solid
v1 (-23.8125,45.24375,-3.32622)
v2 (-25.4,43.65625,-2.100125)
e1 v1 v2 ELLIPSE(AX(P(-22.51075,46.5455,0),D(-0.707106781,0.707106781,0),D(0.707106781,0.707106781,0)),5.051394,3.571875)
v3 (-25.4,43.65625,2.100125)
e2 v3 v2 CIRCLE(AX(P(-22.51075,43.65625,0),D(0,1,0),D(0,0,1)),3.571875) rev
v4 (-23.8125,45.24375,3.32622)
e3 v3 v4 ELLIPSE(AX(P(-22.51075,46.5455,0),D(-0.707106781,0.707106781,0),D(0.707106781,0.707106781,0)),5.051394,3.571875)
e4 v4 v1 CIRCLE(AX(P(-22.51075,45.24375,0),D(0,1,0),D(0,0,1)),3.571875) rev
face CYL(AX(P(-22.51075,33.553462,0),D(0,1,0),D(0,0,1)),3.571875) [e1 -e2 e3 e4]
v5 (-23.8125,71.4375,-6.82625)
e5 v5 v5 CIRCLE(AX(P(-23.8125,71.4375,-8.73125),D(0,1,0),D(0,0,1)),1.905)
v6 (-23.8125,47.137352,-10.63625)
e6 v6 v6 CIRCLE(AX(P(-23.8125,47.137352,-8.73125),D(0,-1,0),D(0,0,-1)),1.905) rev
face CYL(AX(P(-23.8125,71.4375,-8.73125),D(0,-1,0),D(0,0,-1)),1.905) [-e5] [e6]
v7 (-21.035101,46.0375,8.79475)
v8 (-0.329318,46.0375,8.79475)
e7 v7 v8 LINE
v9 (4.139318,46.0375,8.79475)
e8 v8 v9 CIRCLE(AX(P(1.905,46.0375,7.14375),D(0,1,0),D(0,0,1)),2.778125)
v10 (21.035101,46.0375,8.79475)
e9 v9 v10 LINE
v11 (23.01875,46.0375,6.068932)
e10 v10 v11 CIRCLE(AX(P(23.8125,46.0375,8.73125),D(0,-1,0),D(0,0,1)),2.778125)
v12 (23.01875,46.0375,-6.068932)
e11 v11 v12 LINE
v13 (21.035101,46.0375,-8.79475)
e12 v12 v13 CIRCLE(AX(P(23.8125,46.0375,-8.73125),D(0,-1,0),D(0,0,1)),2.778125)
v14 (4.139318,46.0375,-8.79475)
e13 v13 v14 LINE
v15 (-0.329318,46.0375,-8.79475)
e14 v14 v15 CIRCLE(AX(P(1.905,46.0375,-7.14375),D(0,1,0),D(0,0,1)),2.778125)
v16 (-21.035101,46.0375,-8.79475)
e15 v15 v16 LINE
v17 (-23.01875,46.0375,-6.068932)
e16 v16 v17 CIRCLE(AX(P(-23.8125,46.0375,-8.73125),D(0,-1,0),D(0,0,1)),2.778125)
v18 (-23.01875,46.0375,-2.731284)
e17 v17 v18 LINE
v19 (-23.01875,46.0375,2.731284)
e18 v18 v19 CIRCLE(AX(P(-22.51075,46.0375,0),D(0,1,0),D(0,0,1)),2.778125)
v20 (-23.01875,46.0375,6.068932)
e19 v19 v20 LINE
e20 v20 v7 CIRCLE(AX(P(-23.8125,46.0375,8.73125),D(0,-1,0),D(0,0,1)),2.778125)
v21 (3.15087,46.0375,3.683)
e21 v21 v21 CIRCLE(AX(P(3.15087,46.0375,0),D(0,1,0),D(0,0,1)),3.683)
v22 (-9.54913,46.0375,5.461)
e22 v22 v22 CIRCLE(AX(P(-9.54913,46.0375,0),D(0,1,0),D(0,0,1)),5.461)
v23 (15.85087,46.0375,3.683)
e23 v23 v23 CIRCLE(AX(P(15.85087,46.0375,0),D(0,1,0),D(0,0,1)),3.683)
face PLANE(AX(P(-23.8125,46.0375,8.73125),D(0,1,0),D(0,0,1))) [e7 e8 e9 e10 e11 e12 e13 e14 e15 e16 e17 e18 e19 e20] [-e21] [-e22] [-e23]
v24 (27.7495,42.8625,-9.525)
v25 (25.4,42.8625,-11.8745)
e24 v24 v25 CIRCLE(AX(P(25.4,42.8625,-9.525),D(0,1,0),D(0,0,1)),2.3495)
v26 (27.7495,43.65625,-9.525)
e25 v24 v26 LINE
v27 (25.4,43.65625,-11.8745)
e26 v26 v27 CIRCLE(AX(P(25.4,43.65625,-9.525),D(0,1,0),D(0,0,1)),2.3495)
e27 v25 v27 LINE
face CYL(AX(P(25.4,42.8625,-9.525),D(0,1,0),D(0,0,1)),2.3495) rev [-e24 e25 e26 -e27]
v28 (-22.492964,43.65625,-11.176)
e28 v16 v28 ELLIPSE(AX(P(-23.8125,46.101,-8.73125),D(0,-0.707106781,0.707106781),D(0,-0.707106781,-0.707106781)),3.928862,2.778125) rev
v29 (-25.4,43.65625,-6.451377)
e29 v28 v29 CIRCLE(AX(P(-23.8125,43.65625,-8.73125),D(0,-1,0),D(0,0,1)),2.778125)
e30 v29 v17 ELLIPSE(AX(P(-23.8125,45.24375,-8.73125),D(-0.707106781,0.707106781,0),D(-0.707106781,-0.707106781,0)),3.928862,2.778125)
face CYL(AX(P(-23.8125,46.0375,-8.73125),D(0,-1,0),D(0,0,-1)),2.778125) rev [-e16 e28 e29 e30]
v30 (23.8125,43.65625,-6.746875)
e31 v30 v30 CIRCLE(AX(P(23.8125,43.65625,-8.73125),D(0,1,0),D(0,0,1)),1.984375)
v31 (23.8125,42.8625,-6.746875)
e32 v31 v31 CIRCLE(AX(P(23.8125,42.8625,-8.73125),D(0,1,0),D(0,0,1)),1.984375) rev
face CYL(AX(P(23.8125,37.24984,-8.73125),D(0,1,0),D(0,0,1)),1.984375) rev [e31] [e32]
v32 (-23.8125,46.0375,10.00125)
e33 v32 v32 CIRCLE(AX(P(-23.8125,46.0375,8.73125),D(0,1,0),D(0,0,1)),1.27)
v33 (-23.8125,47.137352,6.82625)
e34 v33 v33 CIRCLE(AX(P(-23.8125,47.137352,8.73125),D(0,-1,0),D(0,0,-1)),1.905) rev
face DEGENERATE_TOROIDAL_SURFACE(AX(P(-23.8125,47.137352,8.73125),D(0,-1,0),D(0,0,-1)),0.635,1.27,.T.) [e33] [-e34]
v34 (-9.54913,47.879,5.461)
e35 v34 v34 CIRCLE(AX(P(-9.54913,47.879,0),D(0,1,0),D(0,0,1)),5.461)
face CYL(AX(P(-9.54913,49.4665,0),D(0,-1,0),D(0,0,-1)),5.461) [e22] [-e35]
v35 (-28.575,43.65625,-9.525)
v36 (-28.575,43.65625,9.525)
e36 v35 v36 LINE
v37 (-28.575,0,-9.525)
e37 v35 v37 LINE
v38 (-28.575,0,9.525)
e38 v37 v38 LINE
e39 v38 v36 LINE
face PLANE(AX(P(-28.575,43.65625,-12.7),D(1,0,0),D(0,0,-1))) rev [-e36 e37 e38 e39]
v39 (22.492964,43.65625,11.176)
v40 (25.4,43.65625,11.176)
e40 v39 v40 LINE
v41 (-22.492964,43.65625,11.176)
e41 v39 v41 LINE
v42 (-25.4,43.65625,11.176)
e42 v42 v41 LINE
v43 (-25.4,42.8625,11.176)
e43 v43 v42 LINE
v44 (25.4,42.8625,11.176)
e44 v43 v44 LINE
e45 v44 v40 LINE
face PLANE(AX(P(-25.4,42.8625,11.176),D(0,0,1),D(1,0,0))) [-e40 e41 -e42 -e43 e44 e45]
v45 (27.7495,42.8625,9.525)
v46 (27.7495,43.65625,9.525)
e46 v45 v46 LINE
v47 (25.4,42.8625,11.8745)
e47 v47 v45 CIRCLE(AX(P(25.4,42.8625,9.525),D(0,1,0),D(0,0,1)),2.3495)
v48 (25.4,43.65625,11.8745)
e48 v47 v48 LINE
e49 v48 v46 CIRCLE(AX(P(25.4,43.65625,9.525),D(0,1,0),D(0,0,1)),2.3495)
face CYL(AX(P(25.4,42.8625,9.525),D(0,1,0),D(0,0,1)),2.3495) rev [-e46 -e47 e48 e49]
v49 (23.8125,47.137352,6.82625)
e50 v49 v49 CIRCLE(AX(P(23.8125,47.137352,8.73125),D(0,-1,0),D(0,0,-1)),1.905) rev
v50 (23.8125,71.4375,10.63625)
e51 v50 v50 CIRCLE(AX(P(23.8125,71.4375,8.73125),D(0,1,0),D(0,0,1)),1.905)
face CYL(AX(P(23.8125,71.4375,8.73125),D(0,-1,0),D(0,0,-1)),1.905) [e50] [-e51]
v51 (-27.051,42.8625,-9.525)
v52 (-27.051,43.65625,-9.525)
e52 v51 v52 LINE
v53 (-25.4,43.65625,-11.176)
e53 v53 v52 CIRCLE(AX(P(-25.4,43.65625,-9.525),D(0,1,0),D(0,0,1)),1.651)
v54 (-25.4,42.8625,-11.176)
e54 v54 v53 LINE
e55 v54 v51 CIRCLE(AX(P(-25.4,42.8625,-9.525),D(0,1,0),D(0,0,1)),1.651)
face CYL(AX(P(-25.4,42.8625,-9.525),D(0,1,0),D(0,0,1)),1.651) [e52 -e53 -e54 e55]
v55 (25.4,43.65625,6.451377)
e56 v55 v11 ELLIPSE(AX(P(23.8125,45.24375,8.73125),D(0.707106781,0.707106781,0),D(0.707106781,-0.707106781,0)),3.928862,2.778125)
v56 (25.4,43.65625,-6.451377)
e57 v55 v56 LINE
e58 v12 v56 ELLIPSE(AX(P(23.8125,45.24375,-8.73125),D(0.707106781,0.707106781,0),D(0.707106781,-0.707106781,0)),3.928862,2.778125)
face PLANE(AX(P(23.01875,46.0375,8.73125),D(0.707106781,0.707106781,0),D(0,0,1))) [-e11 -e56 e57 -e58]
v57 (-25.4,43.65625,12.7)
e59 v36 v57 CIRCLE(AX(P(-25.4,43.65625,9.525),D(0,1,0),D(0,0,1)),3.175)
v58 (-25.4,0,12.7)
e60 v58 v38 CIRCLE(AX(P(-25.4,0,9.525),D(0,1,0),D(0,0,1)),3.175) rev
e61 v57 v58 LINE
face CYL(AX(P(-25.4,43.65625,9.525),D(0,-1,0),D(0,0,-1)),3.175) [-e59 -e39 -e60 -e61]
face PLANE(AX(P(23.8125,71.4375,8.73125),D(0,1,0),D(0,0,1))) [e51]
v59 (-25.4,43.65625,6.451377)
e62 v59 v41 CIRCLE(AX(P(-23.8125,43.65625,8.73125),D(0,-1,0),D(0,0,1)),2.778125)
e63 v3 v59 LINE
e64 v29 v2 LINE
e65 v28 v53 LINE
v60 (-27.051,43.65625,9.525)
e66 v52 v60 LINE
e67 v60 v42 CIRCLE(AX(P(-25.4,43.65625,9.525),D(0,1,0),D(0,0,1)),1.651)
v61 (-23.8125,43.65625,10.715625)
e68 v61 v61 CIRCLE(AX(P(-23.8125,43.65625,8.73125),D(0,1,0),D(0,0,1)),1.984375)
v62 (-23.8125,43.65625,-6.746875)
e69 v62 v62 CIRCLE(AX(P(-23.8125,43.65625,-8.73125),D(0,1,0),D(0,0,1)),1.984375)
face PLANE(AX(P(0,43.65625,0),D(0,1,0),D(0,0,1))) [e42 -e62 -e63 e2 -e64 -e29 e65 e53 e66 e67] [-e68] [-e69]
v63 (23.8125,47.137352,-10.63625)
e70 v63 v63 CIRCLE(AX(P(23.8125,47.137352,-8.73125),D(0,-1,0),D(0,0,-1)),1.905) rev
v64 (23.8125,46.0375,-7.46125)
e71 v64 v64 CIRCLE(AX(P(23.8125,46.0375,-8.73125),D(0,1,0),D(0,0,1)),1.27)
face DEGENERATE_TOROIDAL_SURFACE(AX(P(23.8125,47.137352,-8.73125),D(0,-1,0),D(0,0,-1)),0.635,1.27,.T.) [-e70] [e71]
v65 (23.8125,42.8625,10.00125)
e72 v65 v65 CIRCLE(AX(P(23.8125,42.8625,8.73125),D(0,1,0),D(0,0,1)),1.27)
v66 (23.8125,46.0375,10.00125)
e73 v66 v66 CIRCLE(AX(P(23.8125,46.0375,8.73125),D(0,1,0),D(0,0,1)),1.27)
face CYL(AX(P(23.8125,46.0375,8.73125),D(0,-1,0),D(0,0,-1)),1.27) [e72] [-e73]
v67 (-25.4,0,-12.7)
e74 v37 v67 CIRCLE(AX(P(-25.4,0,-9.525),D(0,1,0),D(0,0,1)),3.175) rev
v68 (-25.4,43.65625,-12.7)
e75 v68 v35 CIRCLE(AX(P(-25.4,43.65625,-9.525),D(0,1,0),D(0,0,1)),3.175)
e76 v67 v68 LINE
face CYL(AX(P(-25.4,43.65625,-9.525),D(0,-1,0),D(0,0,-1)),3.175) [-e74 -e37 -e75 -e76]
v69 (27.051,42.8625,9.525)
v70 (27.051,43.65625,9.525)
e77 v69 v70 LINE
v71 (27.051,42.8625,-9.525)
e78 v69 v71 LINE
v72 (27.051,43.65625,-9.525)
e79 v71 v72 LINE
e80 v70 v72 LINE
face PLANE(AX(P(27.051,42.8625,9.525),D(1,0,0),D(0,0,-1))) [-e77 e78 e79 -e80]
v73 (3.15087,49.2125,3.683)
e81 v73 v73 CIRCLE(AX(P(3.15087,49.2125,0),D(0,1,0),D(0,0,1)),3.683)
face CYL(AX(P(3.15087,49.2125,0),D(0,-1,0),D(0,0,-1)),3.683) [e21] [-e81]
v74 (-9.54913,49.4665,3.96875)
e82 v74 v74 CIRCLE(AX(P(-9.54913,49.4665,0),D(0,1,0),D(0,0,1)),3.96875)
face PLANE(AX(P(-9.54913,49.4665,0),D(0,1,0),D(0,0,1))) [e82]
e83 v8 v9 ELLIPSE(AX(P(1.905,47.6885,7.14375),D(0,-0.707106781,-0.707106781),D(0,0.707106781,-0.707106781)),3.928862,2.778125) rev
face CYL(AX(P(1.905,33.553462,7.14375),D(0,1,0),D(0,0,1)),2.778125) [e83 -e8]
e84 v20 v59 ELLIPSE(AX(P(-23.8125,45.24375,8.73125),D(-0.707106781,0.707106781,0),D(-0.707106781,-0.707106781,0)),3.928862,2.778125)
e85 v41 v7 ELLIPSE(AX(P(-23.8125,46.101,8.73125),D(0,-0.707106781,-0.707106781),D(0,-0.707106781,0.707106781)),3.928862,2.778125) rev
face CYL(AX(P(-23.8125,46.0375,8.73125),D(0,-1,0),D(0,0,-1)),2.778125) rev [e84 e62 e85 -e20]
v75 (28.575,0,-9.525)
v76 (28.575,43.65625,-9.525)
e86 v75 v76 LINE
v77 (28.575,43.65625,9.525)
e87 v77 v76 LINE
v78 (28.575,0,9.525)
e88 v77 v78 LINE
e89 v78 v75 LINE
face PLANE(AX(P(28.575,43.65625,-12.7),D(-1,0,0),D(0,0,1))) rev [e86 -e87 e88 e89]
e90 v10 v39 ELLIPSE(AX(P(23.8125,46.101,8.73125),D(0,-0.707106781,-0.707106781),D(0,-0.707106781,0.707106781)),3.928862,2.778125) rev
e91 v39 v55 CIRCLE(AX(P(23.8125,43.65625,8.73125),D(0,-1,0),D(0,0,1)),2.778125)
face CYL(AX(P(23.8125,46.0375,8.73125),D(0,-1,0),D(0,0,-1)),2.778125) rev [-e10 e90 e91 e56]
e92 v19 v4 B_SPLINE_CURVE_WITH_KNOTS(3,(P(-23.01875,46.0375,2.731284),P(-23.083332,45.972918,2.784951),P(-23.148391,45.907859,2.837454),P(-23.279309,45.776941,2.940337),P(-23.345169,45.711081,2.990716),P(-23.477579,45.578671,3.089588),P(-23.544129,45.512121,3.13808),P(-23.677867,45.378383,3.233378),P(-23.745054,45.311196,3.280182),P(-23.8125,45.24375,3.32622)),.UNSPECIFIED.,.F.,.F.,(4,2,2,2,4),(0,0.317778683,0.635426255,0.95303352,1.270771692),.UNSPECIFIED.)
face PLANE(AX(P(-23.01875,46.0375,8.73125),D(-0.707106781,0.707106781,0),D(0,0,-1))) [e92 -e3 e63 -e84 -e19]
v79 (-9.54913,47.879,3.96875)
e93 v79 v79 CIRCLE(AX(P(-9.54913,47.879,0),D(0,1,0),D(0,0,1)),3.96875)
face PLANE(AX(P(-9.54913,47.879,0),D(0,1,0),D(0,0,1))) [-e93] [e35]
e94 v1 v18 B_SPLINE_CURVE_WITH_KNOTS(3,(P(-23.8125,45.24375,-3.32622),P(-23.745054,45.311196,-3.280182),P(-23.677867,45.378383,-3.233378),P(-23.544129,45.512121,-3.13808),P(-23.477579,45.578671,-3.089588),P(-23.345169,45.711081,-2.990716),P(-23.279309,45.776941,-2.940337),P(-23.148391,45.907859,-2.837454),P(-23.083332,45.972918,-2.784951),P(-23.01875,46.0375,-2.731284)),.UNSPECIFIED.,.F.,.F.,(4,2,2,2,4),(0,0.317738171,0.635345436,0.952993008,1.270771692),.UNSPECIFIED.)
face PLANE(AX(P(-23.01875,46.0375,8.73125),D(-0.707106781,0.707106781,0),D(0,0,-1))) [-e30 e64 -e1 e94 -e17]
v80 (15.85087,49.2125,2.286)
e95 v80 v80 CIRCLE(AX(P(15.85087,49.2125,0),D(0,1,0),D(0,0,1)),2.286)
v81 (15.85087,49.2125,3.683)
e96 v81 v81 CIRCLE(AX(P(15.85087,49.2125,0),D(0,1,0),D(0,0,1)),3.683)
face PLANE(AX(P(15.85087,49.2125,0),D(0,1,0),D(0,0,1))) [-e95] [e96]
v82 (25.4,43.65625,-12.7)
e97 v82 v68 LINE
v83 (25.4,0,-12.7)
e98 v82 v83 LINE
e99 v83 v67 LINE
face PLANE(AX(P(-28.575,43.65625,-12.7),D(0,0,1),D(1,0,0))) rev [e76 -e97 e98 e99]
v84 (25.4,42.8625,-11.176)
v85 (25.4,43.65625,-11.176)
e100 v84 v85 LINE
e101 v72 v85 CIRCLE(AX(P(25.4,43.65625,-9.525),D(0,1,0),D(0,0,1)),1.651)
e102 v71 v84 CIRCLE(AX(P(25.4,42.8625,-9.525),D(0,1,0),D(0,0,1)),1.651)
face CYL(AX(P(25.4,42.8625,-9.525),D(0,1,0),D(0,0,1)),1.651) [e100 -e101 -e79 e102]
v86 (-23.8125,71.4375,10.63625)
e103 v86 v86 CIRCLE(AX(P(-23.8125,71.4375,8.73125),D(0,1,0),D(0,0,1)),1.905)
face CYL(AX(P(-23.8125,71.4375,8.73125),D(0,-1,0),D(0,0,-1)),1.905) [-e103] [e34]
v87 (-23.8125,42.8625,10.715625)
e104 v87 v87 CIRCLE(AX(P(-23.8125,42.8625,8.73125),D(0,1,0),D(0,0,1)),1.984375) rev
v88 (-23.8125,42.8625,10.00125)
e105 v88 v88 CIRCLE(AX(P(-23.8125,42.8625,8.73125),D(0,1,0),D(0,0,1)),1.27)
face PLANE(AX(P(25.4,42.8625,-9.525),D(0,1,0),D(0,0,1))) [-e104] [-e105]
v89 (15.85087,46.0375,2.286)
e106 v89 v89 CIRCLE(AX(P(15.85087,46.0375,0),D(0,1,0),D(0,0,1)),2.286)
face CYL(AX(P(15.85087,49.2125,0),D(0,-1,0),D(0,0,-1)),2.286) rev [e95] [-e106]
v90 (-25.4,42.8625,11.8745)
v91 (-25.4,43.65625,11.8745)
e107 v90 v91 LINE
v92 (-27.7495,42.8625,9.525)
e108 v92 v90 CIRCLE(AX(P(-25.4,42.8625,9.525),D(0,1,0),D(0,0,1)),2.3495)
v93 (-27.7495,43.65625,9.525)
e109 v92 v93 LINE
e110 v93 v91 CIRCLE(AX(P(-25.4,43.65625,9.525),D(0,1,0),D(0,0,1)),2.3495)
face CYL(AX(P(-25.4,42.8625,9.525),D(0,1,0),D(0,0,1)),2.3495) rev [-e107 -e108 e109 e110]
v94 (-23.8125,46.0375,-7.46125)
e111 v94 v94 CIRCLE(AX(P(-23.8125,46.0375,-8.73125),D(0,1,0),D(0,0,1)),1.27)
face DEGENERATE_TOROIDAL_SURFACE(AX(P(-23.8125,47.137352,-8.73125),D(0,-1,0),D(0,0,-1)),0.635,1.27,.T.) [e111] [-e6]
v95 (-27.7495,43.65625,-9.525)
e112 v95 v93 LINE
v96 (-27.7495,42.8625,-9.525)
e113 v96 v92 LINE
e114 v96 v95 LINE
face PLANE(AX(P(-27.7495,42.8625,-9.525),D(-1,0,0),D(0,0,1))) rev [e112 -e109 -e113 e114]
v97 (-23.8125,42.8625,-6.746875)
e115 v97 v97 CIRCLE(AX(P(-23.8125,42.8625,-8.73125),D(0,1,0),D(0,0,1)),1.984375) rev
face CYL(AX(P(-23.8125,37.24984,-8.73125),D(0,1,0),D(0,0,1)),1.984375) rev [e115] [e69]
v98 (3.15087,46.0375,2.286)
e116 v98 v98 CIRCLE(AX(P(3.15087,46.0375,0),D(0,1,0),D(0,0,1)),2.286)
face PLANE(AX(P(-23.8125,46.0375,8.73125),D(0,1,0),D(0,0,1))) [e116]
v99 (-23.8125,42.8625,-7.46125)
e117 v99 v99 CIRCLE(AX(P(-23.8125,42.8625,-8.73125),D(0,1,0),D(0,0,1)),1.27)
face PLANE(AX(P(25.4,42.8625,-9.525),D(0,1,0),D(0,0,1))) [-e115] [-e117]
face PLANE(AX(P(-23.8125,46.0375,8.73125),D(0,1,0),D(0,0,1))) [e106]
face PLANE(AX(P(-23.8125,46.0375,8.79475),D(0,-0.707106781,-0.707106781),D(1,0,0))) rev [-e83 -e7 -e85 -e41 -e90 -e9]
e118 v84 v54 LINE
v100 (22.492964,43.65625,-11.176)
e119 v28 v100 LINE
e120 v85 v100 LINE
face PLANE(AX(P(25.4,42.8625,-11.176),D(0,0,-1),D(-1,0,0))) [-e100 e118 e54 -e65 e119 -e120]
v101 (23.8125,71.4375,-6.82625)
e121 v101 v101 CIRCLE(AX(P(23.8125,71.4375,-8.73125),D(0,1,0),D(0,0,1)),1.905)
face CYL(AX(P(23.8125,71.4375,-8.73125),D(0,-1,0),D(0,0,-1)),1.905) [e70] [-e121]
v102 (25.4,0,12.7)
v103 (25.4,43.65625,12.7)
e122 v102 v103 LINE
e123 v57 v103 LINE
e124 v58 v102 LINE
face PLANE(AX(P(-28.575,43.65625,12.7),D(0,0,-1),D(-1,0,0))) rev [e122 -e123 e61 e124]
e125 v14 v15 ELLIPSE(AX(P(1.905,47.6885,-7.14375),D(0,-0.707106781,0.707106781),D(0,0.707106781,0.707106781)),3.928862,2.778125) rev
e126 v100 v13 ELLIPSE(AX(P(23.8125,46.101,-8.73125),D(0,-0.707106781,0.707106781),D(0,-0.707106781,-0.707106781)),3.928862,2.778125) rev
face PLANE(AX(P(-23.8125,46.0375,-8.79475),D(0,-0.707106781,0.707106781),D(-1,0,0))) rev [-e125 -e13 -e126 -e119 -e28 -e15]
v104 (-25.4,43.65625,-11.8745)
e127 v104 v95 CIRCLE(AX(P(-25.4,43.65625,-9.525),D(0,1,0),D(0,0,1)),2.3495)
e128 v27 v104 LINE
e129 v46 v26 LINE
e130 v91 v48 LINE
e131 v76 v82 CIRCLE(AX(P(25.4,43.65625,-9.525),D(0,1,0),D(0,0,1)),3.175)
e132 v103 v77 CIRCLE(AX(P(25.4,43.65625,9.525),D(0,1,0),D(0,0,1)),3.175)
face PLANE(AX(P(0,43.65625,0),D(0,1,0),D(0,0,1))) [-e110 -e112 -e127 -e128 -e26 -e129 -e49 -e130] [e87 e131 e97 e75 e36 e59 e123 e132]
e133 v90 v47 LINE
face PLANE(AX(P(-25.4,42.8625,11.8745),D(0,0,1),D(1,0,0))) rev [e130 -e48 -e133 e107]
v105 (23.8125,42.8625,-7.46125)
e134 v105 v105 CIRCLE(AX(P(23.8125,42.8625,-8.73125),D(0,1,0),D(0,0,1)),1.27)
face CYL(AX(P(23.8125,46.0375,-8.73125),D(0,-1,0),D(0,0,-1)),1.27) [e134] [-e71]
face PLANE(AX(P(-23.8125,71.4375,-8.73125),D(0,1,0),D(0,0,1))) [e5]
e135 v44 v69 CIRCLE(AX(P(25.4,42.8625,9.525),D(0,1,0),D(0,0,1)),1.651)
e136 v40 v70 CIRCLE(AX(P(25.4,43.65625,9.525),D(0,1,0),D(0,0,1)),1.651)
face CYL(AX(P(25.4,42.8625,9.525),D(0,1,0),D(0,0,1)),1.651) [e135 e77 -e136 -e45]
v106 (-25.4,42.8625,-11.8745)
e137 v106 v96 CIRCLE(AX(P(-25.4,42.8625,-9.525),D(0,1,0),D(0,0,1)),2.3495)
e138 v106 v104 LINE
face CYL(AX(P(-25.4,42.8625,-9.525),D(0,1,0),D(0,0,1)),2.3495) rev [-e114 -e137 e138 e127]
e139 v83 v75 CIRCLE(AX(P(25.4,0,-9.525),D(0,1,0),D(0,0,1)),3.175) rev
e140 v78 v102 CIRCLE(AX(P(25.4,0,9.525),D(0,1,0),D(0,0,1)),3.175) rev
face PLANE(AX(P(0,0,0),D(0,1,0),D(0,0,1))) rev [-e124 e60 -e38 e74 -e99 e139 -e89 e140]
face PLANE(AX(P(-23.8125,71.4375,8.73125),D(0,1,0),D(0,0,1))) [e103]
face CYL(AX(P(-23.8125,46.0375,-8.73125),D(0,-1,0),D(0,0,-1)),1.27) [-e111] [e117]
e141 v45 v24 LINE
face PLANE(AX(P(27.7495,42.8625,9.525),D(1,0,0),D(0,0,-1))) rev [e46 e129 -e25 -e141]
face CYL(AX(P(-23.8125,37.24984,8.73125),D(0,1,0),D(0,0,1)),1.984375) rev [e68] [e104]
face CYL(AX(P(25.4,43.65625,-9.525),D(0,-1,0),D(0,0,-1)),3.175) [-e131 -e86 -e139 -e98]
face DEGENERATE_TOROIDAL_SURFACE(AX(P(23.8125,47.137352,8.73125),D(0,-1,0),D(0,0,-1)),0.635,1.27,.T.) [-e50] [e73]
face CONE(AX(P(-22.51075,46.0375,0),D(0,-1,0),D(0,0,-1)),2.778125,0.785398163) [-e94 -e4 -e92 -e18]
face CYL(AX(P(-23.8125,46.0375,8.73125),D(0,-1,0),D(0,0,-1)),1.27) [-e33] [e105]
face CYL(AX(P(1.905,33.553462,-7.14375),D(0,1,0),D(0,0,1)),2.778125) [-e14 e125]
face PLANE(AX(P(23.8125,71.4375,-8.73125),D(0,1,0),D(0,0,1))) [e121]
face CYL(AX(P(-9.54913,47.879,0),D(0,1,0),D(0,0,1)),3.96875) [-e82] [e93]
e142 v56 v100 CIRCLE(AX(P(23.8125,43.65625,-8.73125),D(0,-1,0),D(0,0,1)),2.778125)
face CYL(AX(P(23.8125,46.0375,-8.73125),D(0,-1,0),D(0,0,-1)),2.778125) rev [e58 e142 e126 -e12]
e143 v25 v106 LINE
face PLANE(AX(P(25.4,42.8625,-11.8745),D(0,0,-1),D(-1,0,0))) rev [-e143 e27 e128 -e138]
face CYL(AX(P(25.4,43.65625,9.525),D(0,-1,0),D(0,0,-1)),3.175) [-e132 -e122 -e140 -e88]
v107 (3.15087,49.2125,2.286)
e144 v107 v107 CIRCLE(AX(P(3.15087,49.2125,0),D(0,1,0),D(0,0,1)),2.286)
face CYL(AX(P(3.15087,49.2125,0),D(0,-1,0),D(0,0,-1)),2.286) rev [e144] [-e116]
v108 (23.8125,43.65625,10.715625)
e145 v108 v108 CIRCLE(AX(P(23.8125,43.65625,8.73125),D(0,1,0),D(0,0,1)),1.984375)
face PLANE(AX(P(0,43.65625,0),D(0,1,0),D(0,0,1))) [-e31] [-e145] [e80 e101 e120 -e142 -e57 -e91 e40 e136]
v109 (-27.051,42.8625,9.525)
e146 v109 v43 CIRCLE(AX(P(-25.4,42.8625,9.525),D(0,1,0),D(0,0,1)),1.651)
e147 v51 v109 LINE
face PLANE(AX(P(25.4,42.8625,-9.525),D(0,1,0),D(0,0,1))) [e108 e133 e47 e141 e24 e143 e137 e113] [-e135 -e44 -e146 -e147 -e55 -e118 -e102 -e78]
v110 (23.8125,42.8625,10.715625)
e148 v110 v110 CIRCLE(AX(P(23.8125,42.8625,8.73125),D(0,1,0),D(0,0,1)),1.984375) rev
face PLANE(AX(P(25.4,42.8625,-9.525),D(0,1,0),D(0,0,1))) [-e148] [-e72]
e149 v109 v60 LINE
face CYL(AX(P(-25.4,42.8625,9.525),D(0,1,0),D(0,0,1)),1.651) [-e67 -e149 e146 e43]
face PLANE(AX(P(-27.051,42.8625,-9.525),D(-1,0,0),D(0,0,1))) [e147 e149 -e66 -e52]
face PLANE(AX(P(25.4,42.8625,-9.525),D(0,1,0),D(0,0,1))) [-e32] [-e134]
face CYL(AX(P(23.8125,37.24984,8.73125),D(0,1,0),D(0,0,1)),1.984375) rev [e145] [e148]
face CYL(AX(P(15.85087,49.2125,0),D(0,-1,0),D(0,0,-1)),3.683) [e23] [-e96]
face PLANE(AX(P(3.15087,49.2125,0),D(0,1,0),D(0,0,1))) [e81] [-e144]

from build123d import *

# Parameters (mm, degrees)
SKETCH1_W           = 57.15
SKETCH1_H           = 25.4
BOSS_EXTRUDE1_DEPTH = 43.65625
FILLET1_R           = 3.175
CUT_EXTRUDE1_DEPTH  = 0.79375
SKETCH3_R           = 1.984375
CUT_EXTRUDE2_DEPTH  = 0.79375
BOSS_EXTRUDE2_DEPTH = 2.38125
CHAMFER1_SIZE       = 2.38125
SKETCH5_R           = 2.778125
SKETCH5_R_2         = 3.571875
BOSS_EXTRUDE3_DEPTH = 2.38125
CHAMFER2_SIZE       = 0.79375
SKETCH6_R           = 3.683
SKETCH6_R_2         = 2.286
BOSS_EXTRUDE4_DEPTH = 3.175
SKETCH7_R           = 5.461
BOSS_EXTRUDE5_DEPTH = 3.429
SKETCH8_R           = 1.27
BOSS_EXTRUDE6_DEPTH = 3.175
SKETCH9_R           = 1.905
BOSS_EXTRUDE7_DEPTH = 25.4
FILLET2_R           = 1.27
CUT_EXTRUDE3_START  = -1.5875
SKETCH10_R          = 5.461
SKETCH10_R_2        = 3.96875
CUT_EXTRUDE3_DEPTH  = 1.5875


# Some blends are built 0.0001 mm under size
with BuildPart() as part:
    # Sketch1 → Boss-Extrude1 (new body)
    with BuildSketch(Plane(origin=(0, 0, 0), x_dir=(1, 0, 0), z_dir=(0, 1, 0))):
        Rectangle(SKETCH1_W, SKETCH1_H)
    extrude(amount=BOSS_EXTRUDE1_DEPTH)

    # Fillet1
    fillet1_edges = [part.edges().sort_by_distance(p)[0] for p in [
        (28.575, 21.828125, 12.7),
        (-28.575, 21.828125, 12.7),
        (-28.575, 21.828125, -12.7),
        (28.575, 21.828125, -12.7),
    ]]
    fillet(fillet1_edges, radius=FILLET1_R)

    # Sketch2 → Cut-Extrude1 (cut)
    with BuildSketch(Plane(origin=(0, 43.65625, 0), x_dir=(1, 0, 0), z_dir=(0, 1, 0))):
        with BuildLine():
            Line((25.4, 11.8745), (-25.4, 11.8745))
            ThreePointArc((-25.4, 11.8745), (-27.061347382, 11.186347382), (-27.7495, 9.525))
            Line((-27.7495, 9.525), (-27.7495, -9.525))
            ThreePointArc((-27.7495, -9.525), (-27.061347382, -11.186347382), (-25.4, -11.8745))
            Line((-25.4, -11.8745), (25.4, -11.8745))
            ThreePointArc((25.4, -11.8745), (27.061347382, -11.186347382), (27.7495, -9.525))
            Line((27.7495, -9.525), (27.7495, 9.525))
            ThreePointArc((27.7495, 9.525), (27.061347382, 11.186347382), (25.4, 11.8745))
        make_face()
        with BuildLine():
            Line((25.4, 11.176), (-25.4, 11.176))
            ThreePointArc((-25.4, 11.176), (-26.567433296, 10.692433296), (-27.051, 9.525))
            Line((-27.051, 9.525), (-27.051, -9.525))
            ThreePointArc((-27.051, -9.525), (-26.567433296, -10.692433296), (-25.4, -11.176))
            Line((-25.4, -11.176), (25.4, -11.176))
            ThreePointArc((25.4, -11.176), (26.567433296, -10.692433296), (27.051, -9.525))
            Line((27.051, -9.525), (27.051, 9.525))
            ThreePointArc((27.051, 9.525), (26.567433296, 10.692433296), (25.4, 11.176))
        make_face(mode=Mode.SUBTRACT)
    extrude(amount=-CUT_EXTRUDE1_DEPTH, mode=Mode.SUBTRACT)

    # Sketch3 → Cut-Extrude2 (cut)
    with BuildSketch(Plane(origin=(0, 43.65625, 0), x_dir=(1, 0, 0), z_dir=(0, 1, 0))):
        with Locations(Location((-23.8125, 8.73125, 0), (0, 0, 270))):
            Circle(SKETCH3_R)
        with Locations(Location((-23.8125, -8.73125, 0), (0, 0, 270))):
            Circle(SKETCH3_R)
        with Locations(Location((23.8125, -8.73125, 0), (0, 0, 270))):
            Circle(SKETCH3_R)
        with Locations(Location((23.8125, 8.73125, 0), (0, 0, 270))):
            Circle(SKETCH3_R)
    extrude(amount=-CUT_EXTRUDE2_DEPTH, mode=Mode.SUBTRACT)

    # Sketch4 → Boss-Extrude2 (add)
    with BuildSketch(Plane(origin=(0, 43.65625, 0), x_dir=(1, 0, 0), z_dir=(0, 1, 0))):
        with BuildLine():
            Line((22.492963736, -11.176), (-22.492963736, -11.176))
            ThreePointArc((-22.492963736, -11.176), (-21.446391914, -7.275395941), (-25.4, -6.4513767))
            Line((-25.4, -6.4513767), (-25.4, 6.4513767))
            ThreePointArc((-25.4, 6.4513767), (-21.446391914, 7.275395941), (-22.492963736, 11.176))
            Line((-22.492963736, 11.176), (22.492963736, 11.176))
            ThreePointArc((22.492963736, 11.176), (21.446391914, 7.275395941), (25.4, 6.4513767))
            Line((25.4, 6.4513767), (25.4, -6.4513767))
            ThreePointArc((25.4, -6.4513767), (21.446391914, -7.275395941), (22.492963736, -11.176))
        make_face()
    extrude(amount=BOSS_EXTRUDE2_DEPTH)

    # Chamfer1
    chamfer1_edges = [part.edges().sort_by_distance(p)[0] for p in [
        (25.4, 46.0375, 0),
        (0, 46.0375, -11.176),
        (-25.4, 46.0375, 0),
        (0, 46.0375, 11.176),
    ]]
    chamfer(chamfer1_edges, length=CHAMFER1_SIZE - 0.0001)  # a hair under: the kernel refuses the full size

    # Sketch5 → Boss-Extrude3 (add)
    with BuildSketch(Plane(origin=(0, 46.0375, 0), x_dir=(1, 0, 0), z_dir=(0, 1, 0))):
        with Locations((1.905, 7.14375)):
            Circle(SKETCH5_R)
        with Locations((1.905, -7.14375)):
            Circle(SKETCH5_R)
        with Locations((-22.51075, 0)):
            Circle(SKETCH5_R_2)
    extrude(amount=-BOSS_EXTRUDE3_DEPTH)

    # Chamfer2
    chamfer2_edges = [part.edges().sort_by_distance(p)[0] for p in [
        (-26.082625, 46.0375, 0),
    ]]
    chamfer(chamfer2_edges, length=CHAMFER2_SIZE)

    # Sketch6 → Boss-Extrude4 (add)
    # profile 1 of 2: a face of its own
    with BuildSketch(Plane(origin=(0, 46.0375, 0), x_dir=(1, 0, 0), z_dir=(0, 1, 0))):
        with Locations(Location((3.15087, 0, 0), (0, 0, 270))):
            Circle(SKETCH6_R)
        with Locations(Location((3.15087, 0, 0), (0, 0, 270))):
            Circle(SKETCH6_R_2, mode=Mode.SUBTRACT)
    # profile 2 of 2: a face of its own
    with BuildSketch(Plane(origin=(0, 46.0375, 0), x_dir=(1, 0, 0), z_dir=(0, 1, 0))):
        with Locations(Location((15.85087, 0, 0), (0, 0, 270))):
            Circle(SKETCH6_R)
        with Locations(Location((15.85087, 0, 0), (0, 0, 270))):
            Circle(SKETCH6_R_2, mode=Mode.SUBTRACT)
    extrude(amount=BOSS_EXTRUDE4_DEPTH)

    # Sketch7 → Boss-Extrude5 (add)
    with BuildSketch(Plane(origin=(0, 46.0375, 0), x_dir=(1, 0, 0), z_dir=(0, 1, 0))):
        with Locations(Location((-9.54913, 0, 0), (0, 0, 270))):
            Circle(SKETCH7_R)
    extrude(amount=BOSS_EXTRUDE5_DEPTH)

    # Sketch8 → Boss-Extrude6 (add)
    with BuildSketch(Plane(origin=(0, 42.8625, 0), x_dir=(1, 0, 0), z_dir=(0, 1, 0))):
        with Locations(Location((-23.8125, -8.73125, 0), (0, 0, 270))):
            Circle(SKETCH8_R)
        with Locations(Location((23.8125, -8.73125, 0), (0, 0, 270))):
            Circle(SKETCH8_R)
        with Locations(Location((23.8125, 8.73125, 0), (0, 0, 270))):
            Circle(SKETCH8_R)
        with Locations(Location((-23.8125, 8.73125, 0), (0, 0, 270))):
            Circle(SKETCH8_R)
    extrude(amount=BOSS_EXTRUDE6_DEPTH)

    # Sketch9 → Boss-Extrude7 (add)
    with BuildSketch(Plane(origin=(0, 46.0375, 0), x_dir=(1, 0, 0), z_dir=(0, 1, 0))):
        with Locations(Location((-23.8125, -8.73125, 0), (0, 0, 270))):
            Circle(SKETCH9_R)
        with Locations(Location((-23.8125, 8.73125, 0), (0, 0, 270))):
            Circle(SKETCH9_R)
        with Locations(Location((23.8125, 8.73125, 0), (0, 0, 270))):
            Circle(SKETCH9_R)
        with Locations(Location((23.8125, -8.73125, 0), (0, 0, 270))):
            Circle(SKETCH9_R)
    extrude(amount=BOSS_EXTRUDE7_DEPTH)

    # Fillet2
    # the kernel refuses this fillet: 1.27 mm, written as the material it takes off along each edge
    with BuildSketch(Plane(origin=(23.8125, 46.0375, 8.73125), x_dir=(0, 0, 1), z_dir=(-1, 0, 0))) as fillet2_piece_1:
        with BuildLine():
            CenterArc((0.635, 1.099852263), FILLET2_R, 300, 60)
            Line((1.905, 1.099852263), (1.9304, 1.099852263))
            Line((1.9304, 1.099852263), (1.9304, 0))
            Line((1.9304, 0), (1.905, -0.0254))
            ThreePointArc((1.905, -0.0254), (1.5875, -0.0254), (1.2827, -0.021997045))
            Line((1.2827, -0.021997045), (1.27, 0))
        make_face()
    revolve(axis=Axis((23.8125, 46.0375, 8.73125), (0, 1, 0)), mode=Mode.SUBTRACT)
    with BuildSketch(Plane(origin=(23.8125, 46.0375, -8.73125), x_dir=(0, 0, 1), z_dir=(-1, 0, 0))) as fillet2_piece_2:
        with BuildLine():
            CenterArc((0.635, 1.099852263), FILLET2_R, 300, 60)
            Line((1.905, 1.099852263), (1.9304, 1.099852263))
            Line((1.9304, 1.099852263), (1.9304, 0))
            Line((1.9304, 0), (1.905, -0.0254))
            ThreePointArc((1.905, -0.0254), (1.5875, -0.0254), (1.2827, -0.021997045))
            Line((1.2827, -0.021997045), (1.27, 0))
        make_face()
    revolve(axis=Axis((23.8125, 46.0375, -8.73125), (0, 1, 0)), mode=Mode.SUBTRACT)
    with BuildSketch(Plane(origin=(-23.8125, 46.0375, -8.73125), x_dir=(0, 0, 1), z_dir=(-1, 0, 0))) as fillet2_piece_3:
        with BuildLine():
            CenterArc((0.635, 1.099852263), FILLET2_R, 300, 60)
            Line((1.905, 1.099852263), (1.9304, 1.099852263))
            Line((1.9304, 1.099852263), (1.9304, 0))
            Line((1.9304, 0), (1.905, -0.0254))
            ThreePointArc((1.905, -0.0254), (1.5875, -0.0254), (1.2827, -0.021997045))
            Line((1.2827, -0.021997045), (1.27, 0))
        make_face()
    revolve(axis=Axis((-23.8125, 46.0375, -8.73125), (0, 1, 0)), mode=Mode.SUBTRACT)
    with BuildSketch(Plane(origin=(-23.8125, 46.0375, 8.73125), x_dir=(0, 0, 1), z_dir=(-1, 0, 0))) as fillet2_piece_4:
        with BuildLine():
            CenterArc((0.635, 1.099852263), FILLET2_R, 300, 60)
            Line((1.27, 0), (1.2827, -0.021997045))
            ThreePointArc((1.2827, -0.021997045), (1.5875, -0.0254), (1.905, -0.0254))
            Line((1.905, -0.0254), (1.9304, 0))
            Line((1.9304, 0), (1.9304, 1.099852263))
            Line((1.9304, 1.099852263), (1.905, 1.099852263))
        make_face()
    revolve(axis=Axis((-23.8125, 46.0375, 8.73125), (0, 1, 0)), mode=Mode.SUBTRACT)

    # Sketch10 → Cut-Extrude3 (cut)
    with BuildSketch(Plane(origin=(0, 49.4665, 0), x_dir=(1, 0, 0), z_dir=(0, 1, 0)).offset(CUT_EXTRUDE3_START)):
        with Locations(Location((-9.54913, 0, 0), (0, 0, 270))):
            Circle(SKETCH10_R)
        with Locations(Location((-9.54913, 0, 0), (0, 0, 270))):
            Circle(SKETCH10_R_2, mode=Mode.SUBTRACT)
    extrude(amount=CUT_EXTRUDE3_DEPTH, mode=Mode.SUBTRACT)


solid = part.part
